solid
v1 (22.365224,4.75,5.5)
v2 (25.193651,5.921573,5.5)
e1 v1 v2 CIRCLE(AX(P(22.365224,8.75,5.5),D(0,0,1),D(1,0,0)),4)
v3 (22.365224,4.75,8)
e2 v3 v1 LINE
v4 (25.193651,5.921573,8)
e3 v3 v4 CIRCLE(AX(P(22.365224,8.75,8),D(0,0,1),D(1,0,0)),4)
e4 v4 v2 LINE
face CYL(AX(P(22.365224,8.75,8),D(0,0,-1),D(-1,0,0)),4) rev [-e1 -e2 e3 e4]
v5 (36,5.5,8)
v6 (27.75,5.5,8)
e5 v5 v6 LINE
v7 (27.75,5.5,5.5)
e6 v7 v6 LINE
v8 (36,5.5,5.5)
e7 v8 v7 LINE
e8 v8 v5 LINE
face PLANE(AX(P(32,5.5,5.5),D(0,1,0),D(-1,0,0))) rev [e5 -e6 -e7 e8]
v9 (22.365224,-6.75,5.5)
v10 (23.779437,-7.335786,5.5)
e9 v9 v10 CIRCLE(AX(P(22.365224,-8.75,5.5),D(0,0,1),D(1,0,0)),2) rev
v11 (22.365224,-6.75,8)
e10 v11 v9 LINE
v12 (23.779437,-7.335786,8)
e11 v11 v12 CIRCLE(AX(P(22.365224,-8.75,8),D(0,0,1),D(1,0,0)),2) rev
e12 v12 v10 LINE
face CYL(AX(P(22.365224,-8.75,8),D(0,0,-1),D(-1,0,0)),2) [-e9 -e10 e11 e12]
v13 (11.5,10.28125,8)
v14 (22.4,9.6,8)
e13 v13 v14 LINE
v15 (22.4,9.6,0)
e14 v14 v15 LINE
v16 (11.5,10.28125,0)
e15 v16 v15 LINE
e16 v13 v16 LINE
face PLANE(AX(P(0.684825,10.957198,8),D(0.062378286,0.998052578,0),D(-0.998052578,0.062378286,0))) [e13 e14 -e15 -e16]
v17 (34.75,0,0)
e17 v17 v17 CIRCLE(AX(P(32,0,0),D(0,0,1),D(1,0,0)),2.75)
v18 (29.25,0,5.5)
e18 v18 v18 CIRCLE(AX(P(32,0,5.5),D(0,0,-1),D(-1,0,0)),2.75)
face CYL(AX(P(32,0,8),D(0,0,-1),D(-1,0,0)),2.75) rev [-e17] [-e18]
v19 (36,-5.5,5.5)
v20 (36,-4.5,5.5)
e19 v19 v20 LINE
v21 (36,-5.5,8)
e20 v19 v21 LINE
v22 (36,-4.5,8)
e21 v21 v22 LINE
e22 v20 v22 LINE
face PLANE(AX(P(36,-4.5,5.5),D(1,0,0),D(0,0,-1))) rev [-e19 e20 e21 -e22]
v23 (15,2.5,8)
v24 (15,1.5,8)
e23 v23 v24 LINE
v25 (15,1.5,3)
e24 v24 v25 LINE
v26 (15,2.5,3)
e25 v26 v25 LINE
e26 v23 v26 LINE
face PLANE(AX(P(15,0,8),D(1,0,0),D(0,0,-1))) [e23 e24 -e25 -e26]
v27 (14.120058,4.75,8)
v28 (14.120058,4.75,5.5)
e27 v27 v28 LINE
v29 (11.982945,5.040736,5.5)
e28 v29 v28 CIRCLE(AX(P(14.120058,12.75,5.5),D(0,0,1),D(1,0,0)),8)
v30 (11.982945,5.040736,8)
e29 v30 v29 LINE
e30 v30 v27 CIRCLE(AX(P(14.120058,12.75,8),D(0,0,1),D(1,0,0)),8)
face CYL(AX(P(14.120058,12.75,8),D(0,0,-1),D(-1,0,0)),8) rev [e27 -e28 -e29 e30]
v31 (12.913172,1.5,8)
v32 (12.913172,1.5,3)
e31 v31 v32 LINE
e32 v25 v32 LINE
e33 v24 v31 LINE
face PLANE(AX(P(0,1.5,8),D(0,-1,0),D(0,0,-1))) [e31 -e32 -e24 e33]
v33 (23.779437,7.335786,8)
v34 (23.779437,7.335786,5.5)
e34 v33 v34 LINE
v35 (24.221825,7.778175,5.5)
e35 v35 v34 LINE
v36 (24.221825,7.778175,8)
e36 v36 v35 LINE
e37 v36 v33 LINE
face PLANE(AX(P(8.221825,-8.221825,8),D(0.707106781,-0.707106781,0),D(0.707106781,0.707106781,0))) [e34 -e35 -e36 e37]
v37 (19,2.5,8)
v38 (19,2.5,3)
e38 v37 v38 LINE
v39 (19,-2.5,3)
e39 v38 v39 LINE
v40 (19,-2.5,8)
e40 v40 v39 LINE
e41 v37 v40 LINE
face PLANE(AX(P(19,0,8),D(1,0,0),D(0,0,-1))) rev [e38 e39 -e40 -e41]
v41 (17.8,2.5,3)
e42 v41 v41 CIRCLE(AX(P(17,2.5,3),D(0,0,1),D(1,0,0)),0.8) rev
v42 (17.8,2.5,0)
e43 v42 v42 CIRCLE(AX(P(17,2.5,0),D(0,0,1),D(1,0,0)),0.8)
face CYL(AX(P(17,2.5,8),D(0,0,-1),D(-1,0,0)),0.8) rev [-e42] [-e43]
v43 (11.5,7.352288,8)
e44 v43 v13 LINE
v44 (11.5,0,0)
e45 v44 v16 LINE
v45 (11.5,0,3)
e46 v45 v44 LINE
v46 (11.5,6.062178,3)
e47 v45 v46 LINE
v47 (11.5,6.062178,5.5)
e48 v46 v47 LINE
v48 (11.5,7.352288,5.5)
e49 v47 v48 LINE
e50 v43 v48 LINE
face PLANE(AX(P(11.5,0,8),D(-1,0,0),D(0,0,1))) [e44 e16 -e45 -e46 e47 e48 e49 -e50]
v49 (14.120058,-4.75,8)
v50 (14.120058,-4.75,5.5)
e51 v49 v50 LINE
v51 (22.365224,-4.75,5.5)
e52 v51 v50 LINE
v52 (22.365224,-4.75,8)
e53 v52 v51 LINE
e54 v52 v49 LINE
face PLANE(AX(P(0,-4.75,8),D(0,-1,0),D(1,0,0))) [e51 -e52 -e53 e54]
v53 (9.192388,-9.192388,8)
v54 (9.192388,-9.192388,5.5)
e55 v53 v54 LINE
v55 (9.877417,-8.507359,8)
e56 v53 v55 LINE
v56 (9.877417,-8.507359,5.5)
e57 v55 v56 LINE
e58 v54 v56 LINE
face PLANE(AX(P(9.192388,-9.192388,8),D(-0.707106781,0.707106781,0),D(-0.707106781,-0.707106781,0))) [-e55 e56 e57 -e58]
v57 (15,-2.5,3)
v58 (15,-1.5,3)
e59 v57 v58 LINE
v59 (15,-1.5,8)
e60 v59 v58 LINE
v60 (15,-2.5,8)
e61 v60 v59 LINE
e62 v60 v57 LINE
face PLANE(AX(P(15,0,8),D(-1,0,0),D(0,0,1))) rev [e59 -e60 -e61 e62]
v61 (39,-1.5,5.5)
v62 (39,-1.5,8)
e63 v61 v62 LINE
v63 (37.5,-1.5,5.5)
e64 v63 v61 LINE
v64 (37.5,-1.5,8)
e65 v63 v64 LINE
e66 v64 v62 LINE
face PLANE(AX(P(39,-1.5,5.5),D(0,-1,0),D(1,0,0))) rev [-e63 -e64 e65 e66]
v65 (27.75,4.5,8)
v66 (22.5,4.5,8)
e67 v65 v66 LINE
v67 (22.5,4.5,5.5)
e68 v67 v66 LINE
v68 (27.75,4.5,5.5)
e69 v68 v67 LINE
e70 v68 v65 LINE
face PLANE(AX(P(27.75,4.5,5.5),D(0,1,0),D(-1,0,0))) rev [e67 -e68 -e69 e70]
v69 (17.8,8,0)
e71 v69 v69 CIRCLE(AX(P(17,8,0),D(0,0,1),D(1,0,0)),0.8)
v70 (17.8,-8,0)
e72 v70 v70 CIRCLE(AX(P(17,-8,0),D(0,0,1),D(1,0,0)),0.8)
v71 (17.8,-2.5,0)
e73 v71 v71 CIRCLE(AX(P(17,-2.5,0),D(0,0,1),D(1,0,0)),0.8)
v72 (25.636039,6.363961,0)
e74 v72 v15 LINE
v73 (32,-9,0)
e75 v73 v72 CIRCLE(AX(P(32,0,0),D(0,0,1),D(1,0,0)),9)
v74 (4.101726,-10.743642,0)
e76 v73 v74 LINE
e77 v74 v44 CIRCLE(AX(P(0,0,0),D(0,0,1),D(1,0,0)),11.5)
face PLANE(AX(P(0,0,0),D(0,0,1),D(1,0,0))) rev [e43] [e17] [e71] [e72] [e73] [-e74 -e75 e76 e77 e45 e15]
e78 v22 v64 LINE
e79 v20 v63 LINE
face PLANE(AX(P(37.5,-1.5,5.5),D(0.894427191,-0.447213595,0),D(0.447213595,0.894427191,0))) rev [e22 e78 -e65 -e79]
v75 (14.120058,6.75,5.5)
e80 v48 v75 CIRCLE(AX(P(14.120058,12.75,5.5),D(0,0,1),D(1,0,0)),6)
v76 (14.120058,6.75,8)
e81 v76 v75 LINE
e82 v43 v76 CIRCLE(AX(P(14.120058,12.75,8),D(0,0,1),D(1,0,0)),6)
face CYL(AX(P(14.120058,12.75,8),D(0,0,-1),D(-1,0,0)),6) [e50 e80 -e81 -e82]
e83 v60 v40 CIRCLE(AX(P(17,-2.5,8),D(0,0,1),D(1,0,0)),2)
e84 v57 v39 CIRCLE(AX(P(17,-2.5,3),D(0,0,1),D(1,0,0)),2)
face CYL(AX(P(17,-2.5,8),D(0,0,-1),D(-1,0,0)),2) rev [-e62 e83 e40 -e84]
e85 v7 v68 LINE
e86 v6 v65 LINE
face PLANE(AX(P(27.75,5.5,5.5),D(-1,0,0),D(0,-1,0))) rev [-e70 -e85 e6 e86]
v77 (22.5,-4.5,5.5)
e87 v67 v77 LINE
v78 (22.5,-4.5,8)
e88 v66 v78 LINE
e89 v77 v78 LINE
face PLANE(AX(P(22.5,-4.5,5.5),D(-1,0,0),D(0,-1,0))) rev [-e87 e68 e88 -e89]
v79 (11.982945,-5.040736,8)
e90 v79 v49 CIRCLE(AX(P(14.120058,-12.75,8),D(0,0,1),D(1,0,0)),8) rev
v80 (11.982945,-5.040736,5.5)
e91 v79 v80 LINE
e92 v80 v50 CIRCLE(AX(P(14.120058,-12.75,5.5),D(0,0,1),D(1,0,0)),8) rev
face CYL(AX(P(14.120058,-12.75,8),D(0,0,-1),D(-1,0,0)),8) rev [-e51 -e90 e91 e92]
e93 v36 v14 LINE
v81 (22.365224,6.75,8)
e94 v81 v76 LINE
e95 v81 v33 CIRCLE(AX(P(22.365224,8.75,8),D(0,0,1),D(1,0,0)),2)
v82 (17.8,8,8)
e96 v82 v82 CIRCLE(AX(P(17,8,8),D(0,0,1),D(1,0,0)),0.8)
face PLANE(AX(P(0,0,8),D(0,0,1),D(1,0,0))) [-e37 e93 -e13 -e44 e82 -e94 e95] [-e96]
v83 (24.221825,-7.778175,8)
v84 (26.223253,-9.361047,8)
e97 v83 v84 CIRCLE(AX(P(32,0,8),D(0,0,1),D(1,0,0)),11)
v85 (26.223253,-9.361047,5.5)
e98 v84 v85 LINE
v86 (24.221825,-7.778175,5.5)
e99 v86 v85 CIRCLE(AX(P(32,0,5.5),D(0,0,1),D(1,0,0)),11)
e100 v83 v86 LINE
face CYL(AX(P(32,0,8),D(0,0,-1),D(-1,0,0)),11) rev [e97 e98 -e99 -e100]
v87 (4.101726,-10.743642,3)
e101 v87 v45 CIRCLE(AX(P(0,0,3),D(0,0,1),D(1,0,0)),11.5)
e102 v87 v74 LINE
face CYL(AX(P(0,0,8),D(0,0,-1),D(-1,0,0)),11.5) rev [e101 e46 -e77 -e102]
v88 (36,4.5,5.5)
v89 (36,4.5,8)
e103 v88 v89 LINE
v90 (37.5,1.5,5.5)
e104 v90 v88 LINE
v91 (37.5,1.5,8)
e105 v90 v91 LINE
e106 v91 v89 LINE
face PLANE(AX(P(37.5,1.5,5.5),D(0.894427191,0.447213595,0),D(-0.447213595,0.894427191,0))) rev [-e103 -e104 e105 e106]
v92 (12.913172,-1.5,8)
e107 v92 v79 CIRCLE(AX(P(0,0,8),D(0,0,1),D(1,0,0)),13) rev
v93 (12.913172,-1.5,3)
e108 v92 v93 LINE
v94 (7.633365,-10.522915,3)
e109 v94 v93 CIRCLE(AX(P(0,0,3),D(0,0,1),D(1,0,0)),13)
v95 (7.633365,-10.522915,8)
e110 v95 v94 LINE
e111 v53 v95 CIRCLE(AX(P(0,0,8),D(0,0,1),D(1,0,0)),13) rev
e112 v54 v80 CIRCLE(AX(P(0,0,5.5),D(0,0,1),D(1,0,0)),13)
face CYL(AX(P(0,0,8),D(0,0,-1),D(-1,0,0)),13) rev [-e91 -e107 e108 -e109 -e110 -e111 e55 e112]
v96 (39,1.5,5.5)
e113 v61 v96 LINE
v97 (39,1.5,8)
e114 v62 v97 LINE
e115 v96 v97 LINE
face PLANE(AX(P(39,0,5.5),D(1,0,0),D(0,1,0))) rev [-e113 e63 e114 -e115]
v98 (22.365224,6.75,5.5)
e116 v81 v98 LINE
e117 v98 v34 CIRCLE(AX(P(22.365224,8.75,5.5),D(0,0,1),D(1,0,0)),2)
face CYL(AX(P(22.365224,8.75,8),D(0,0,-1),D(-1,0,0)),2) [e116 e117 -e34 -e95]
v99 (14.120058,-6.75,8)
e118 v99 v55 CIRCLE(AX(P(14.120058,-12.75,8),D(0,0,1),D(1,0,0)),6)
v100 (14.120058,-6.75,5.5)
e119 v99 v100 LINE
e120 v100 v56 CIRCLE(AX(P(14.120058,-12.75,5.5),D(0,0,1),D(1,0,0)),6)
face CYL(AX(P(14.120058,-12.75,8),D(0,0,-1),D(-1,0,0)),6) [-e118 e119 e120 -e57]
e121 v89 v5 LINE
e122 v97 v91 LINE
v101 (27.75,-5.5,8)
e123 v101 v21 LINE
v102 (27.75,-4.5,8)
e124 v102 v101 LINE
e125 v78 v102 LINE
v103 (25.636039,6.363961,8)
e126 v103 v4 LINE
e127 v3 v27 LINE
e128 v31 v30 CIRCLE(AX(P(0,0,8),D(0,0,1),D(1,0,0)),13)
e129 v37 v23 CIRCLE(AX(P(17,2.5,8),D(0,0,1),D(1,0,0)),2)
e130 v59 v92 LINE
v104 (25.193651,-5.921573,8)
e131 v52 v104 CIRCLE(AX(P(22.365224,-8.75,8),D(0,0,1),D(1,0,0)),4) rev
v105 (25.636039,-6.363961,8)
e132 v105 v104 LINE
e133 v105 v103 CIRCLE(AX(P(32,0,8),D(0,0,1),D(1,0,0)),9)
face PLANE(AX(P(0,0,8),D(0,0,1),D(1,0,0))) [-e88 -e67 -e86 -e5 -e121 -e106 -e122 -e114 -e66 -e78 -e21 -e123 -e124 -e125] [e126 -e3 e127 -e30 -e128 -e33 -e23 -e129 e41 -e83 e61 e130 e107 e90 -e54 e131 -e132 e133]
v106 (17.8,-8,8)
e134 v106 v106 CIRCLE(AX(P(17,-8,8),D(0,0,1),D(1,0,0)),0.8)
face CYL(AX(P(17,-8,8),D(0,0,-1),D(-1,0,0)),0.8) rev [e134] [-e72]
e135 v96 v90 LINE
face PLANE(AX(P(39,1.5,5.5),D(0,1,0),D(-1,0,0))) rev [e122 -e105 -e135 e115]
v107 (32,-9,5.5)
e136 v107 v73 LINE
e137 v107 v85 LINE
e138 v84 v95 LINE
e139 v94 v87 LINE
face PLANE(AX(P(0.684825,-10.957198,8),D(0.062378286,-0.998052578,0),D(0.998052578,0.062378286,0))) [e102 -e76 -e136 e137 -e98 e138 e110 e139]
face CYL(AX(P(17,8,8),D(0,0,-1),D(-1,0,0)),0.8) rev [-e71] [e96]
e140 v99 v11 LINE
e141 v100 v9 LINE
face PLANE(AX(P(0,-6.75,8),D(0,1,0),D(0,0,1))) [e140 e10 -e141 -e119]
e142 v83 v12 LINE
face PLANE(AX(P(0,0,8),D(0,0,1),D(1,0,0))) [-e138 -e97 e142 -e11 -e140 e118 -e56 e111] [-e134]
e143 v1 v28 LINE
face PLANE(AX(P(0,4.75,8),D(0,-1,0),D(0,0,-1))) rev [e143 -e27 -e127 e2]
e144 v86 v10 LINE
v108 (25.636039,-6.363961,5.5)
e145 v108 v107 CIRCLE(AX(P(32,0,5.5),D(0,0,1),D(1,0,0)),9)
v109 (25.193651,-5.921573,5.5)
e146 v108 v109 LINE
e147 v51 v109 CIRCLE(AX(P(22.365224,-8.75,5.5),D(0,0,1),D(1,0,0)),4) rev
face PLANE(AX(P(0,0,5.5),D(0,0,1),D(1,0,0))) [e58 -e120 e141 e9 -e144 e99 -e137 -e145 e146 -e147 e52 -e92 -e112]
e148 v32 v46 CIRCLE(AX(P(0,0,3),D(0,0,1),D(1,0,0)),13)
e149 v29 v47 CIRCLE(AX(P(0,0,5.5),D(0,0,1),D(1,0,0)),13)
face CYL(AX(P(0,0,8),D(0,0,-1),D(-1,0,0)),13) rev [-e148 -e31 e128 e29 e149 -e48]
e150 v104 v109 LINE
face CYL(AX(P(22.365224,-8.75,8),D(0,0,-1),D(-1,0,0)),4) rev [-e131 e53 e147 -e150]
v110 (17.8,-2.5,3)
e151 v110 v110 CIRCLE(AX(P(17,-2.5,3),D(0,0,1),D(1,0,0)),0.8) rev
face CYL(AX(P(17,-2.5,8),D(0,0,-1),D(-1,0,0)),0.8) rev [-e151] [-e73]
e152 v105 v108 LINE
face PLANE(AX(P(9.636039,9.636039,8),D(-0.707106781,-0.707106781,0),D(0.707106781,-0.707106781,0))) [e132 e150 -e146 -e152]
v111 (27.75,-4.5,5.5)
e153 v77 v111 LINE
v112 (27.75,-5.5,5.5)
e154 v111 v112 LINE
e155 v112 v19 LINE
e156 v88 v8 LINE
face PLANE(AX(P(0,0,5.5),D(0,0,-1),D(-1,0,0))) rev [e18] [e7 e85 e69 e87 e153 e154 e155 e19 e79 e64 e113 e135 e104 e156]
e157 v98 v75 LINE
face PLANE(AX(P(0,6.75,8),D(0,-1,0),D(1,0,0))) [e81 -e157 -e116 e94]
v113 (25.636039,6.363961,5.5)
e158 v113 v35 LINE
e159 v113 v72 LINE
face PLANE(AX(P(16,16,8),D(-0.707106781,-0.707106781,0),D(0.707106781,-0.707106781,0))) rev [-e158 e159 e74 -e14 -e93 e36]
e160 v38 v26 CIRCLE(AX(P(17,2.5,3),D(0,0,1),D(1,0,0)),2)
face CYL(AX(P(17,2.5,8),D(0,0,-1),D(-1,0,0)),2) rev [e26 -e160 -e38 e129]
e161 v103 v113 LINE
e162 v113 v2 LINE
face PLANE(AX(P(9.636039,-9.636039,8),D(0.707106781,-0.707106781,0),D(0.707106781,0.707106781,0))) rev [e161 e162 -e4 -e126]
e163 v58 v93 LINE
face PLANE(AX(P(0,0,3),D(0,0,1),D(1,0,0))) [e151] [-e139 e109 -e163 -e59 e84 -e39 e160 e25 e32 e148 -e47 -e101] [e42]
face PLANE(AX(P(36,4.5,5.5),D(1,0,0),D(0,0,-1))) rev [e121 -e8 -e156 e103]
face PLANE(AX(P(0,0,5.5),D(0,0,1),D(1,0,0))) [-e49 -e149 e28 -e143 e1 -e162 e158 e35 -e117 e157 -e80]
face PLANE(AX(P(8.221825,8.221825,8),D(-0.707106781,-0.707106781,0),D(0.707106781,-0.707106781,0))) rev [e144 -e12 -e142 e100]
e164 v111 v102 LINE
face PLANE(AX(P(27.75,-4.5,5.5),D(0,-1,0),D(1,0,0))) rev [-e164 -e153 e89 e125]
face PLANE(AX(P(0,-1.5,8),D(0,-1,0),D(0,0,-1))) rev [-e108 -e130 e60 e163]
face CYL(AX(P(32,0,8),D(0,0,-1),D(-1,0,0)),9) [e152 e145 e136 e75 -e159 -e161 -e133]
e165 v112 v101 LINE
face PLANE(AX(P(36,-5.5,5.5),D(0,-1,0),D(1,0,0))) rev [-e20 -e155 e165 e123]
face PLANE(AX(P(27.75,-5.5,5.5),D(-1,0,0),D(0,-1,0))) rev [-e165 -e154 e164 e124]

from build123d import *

# Parameters (mm, degrees)
SKETCH1_R                   = 2.75
BOSS_EXTRUDE1_DEPTH         = 8
POT_START                   = 8
POT_INSERT_DEPTH            = 2.5
MIDDLE_START                = 3
SKETCH7_R                   = 11
MIDDLE_FLEX_EXT_CANAL_DEPTH = 5
DISTAL_START                = 5.5
DISTAL_FLEX_EXT_CANAL_DEPTH = 2.5
SKETCH3_R                   = 0.8
SCREW_HOLES_DEPTH           = 44.132654063


with BuildPart() as part:
    # Sketch1 → Boss-Extrude1 (new body)
    with BuildSketch(Plane.XY):
        with BuildLine():
            Line((11.5, 10.28125), (11.5, 0))
            ThreePointArc((11.5, 0), (9.471532219, -6.522275479), (4.101725666, -10.743642146))
            Line((4.101725666, -10.743642146), (32, -9))
            ThreePointArc((32, -9), (40.314915793, 3.444150891), (25.636038969, 6.363961031))
            Line((25.636038969, 6.363961031), (22.4, 9.6))
            Line((22.4, 9.6), (11.5, 10.28125))
        make_face()
        with Locations((32, 0)):
            Circle(SKETCH1_R, mode=Mode.SUBTRACT)
    extrude(amount=BOSS_EXTRUDE1_DEPTH)

    # Sketch2 → Pot Insert (cut)
    with BuildSketch(Plane(origin=(28.28760271, 0, 0), x_dir=(1, 0, 0), z_dir=(0, 0, 1)).offset(POT_START)):
        Polygon((10.71239729, 0), (10.71239729, 1.5), (9.21239729, 1.5), (7.71239729, 4.5), (7.71239729, 5.5), (3.71239729, 5.5), (-0.53760271, 5.5), (-0.53760271, 4.5), (-5.78760271, 4.5), (-5.78760271, 0), (-5.78760271, -4.5), (-0.53760271, -4.5), (-0.53760271, -5.5), (3.71239729, -5.5), (7.71239729, -5.5), (7.71239729, -4.5), (9.21239729, -1.5), (10.71239729, -1.5), align=None)
    extrude(amount=-POT_INSERT_DEPTH, mode=Mode.SUBTRACT)

    # Sketch7 → Middle Flex/Ext Canal (cut)
    with BuildSketch(Plane.XY.offset(MIDDLE_START)):
        with BuildLine():
            ThreePointArc((19, 2.5), (17, 4.5), (15, 2.5))
            Line((15, 2.5), (15, 1.5))
            Line((15, 1.5), (12.91317157, 1.5))
            ThreePointArc((12.91317157, 1.5), (-13, 0), (12.91317157, -1.5))
            Line((12.91317157, -1.5), (15, -1.5))
            Line((15, -1.5), (15, -2.5))
            ThreePointArc((15, -2.5), (17, -4.5), (19, -2.5))
            Line((19, -2.5), (19, 2.5))
        make_face()
        Circle(SKETCH7_R, mode=Mode.SUBTRACT)
    extrude(amount=MIDDLE_FLEX_EXT_CANAL_DEPTH, mode=Mode.SUBTRACT)

    # Sketch6 → Distal Flex/Ext Canal (cut)
    with BuildSketch(Plane.XY.offset(DISTAL_START)):
        with BuildLine():
            ThreePointArc((8.463203436, 7.093145751), (11.058590226, 5.35896374), (14.120057685, 4.75))
            Line((14.120057685, 4.75), (22.365223689, 4.75))
            ThreePointArc((22.365223689, 4.75), (23.895957419, 5.05448187), (25.193650814, 5.921572875))
            Line((25.193650814, 5.921572875), (25.636038969, 6.363961031))
            Line((25.636038969, 6.363961031), (24.221825407, 7.778174593))
            Line((24.221825407, 7.778174593), (23.779437252, 7.335786438))
            ThreePointArc((23.779437252, 7.335786438), (23.130590554, 6.902240935), (22.365223689, 6.75))
            Line((22.365223689, 6.75), (14.120057685, 6.75))
            ThreePointArc((14.120057685, 6.75), (11.823957091, 7.206722805), (9.877416998, 8.507359313))
            Line((9.877416998, 8.507359313), (9.192388155, 9.192388155))
            Line((9.192388155, 9.192388155), (7.778174593, 7.778174593))
            Line((7.778174593, 7.778174593), (8.463203436, 7.093145751))
        make_face()
        with BuildLine():
            Line((1.369649805, -10.914396887), (7.633365377, -10.522914664))
            ThreePointArc((7.633365377, -10.522914664), (8.439139214, -9.888424006), (9.192388155, -9.192388155))
            Line((9.192388155, -9.192388155), (9.877416998, -8.507359313))
            ThreePointArc((9.877416998, -8.507359313), (11.823957091, -7.206722805), (14.120057685, -6.75))
            Line((14.120057685, -6.75), (22.365223689, -6.75))
            ThreePointArc((22.365223689, -6.75), (23.130590554, -6.902240935), (23.779437252, -7.335786438))
            Line((23.779437252, -7.335786438), (24.221825407, -7.778174593))
            ThreePointArc((24.221825407, -7.778174593), (25.176485851, -8.627841831), (26.223253078, -9.361046683))
            Line((26.223253078, -9.361046683), (32, -9))
            ThreePointArc((32, -9), (28.555849109, -8.314915793), (25.636038969, -6.363961031))
            Line((25.636038969, -6.363961031), (25.193650814, -5.921572875))
            ThreePointArc((25.193650814, -5.921572875), (23.895957419, -5.05448187), (22.365223689, -4.75))
            Line((22.365223689, -4.75), (14.120057685, -4.75))
            ThreePointArc((14.120057685, -4.75), (11.058590226, -5.35896374), (8.463203436, -7.093145751))
            Line((8.463203436, -7.093145751), (7.778174593, -7.778174593))
            ThreePointArc((7.778174593, -7.778174593), (4.835250291, -9.880301343), (1.369649805, -10.914396887))
        make_face()
    extrude(amount=DISTAL_FLEX_EXT_CANAL_DEPTH, mode=Mode.SUBTRACT)

    # Sketch3 → Screw Holes (cut, through all)
    with BuildSketch(Plane.XY):
        with Locations((17, 8)):
            Circle(SKETCH3_R)
        with Locations((17, -8)):
            Circle(SKETCH3_R)
        with Locations((17, 2.5)):
            Circle(SKETCH3_R)
        with Locations((17, -2.5)):
            Circle(SKETCH3_R)
    extrude(amount=SCREW_HOLES_DEPTH, mode=Mode.SUBTRACT)


solid = part.part
